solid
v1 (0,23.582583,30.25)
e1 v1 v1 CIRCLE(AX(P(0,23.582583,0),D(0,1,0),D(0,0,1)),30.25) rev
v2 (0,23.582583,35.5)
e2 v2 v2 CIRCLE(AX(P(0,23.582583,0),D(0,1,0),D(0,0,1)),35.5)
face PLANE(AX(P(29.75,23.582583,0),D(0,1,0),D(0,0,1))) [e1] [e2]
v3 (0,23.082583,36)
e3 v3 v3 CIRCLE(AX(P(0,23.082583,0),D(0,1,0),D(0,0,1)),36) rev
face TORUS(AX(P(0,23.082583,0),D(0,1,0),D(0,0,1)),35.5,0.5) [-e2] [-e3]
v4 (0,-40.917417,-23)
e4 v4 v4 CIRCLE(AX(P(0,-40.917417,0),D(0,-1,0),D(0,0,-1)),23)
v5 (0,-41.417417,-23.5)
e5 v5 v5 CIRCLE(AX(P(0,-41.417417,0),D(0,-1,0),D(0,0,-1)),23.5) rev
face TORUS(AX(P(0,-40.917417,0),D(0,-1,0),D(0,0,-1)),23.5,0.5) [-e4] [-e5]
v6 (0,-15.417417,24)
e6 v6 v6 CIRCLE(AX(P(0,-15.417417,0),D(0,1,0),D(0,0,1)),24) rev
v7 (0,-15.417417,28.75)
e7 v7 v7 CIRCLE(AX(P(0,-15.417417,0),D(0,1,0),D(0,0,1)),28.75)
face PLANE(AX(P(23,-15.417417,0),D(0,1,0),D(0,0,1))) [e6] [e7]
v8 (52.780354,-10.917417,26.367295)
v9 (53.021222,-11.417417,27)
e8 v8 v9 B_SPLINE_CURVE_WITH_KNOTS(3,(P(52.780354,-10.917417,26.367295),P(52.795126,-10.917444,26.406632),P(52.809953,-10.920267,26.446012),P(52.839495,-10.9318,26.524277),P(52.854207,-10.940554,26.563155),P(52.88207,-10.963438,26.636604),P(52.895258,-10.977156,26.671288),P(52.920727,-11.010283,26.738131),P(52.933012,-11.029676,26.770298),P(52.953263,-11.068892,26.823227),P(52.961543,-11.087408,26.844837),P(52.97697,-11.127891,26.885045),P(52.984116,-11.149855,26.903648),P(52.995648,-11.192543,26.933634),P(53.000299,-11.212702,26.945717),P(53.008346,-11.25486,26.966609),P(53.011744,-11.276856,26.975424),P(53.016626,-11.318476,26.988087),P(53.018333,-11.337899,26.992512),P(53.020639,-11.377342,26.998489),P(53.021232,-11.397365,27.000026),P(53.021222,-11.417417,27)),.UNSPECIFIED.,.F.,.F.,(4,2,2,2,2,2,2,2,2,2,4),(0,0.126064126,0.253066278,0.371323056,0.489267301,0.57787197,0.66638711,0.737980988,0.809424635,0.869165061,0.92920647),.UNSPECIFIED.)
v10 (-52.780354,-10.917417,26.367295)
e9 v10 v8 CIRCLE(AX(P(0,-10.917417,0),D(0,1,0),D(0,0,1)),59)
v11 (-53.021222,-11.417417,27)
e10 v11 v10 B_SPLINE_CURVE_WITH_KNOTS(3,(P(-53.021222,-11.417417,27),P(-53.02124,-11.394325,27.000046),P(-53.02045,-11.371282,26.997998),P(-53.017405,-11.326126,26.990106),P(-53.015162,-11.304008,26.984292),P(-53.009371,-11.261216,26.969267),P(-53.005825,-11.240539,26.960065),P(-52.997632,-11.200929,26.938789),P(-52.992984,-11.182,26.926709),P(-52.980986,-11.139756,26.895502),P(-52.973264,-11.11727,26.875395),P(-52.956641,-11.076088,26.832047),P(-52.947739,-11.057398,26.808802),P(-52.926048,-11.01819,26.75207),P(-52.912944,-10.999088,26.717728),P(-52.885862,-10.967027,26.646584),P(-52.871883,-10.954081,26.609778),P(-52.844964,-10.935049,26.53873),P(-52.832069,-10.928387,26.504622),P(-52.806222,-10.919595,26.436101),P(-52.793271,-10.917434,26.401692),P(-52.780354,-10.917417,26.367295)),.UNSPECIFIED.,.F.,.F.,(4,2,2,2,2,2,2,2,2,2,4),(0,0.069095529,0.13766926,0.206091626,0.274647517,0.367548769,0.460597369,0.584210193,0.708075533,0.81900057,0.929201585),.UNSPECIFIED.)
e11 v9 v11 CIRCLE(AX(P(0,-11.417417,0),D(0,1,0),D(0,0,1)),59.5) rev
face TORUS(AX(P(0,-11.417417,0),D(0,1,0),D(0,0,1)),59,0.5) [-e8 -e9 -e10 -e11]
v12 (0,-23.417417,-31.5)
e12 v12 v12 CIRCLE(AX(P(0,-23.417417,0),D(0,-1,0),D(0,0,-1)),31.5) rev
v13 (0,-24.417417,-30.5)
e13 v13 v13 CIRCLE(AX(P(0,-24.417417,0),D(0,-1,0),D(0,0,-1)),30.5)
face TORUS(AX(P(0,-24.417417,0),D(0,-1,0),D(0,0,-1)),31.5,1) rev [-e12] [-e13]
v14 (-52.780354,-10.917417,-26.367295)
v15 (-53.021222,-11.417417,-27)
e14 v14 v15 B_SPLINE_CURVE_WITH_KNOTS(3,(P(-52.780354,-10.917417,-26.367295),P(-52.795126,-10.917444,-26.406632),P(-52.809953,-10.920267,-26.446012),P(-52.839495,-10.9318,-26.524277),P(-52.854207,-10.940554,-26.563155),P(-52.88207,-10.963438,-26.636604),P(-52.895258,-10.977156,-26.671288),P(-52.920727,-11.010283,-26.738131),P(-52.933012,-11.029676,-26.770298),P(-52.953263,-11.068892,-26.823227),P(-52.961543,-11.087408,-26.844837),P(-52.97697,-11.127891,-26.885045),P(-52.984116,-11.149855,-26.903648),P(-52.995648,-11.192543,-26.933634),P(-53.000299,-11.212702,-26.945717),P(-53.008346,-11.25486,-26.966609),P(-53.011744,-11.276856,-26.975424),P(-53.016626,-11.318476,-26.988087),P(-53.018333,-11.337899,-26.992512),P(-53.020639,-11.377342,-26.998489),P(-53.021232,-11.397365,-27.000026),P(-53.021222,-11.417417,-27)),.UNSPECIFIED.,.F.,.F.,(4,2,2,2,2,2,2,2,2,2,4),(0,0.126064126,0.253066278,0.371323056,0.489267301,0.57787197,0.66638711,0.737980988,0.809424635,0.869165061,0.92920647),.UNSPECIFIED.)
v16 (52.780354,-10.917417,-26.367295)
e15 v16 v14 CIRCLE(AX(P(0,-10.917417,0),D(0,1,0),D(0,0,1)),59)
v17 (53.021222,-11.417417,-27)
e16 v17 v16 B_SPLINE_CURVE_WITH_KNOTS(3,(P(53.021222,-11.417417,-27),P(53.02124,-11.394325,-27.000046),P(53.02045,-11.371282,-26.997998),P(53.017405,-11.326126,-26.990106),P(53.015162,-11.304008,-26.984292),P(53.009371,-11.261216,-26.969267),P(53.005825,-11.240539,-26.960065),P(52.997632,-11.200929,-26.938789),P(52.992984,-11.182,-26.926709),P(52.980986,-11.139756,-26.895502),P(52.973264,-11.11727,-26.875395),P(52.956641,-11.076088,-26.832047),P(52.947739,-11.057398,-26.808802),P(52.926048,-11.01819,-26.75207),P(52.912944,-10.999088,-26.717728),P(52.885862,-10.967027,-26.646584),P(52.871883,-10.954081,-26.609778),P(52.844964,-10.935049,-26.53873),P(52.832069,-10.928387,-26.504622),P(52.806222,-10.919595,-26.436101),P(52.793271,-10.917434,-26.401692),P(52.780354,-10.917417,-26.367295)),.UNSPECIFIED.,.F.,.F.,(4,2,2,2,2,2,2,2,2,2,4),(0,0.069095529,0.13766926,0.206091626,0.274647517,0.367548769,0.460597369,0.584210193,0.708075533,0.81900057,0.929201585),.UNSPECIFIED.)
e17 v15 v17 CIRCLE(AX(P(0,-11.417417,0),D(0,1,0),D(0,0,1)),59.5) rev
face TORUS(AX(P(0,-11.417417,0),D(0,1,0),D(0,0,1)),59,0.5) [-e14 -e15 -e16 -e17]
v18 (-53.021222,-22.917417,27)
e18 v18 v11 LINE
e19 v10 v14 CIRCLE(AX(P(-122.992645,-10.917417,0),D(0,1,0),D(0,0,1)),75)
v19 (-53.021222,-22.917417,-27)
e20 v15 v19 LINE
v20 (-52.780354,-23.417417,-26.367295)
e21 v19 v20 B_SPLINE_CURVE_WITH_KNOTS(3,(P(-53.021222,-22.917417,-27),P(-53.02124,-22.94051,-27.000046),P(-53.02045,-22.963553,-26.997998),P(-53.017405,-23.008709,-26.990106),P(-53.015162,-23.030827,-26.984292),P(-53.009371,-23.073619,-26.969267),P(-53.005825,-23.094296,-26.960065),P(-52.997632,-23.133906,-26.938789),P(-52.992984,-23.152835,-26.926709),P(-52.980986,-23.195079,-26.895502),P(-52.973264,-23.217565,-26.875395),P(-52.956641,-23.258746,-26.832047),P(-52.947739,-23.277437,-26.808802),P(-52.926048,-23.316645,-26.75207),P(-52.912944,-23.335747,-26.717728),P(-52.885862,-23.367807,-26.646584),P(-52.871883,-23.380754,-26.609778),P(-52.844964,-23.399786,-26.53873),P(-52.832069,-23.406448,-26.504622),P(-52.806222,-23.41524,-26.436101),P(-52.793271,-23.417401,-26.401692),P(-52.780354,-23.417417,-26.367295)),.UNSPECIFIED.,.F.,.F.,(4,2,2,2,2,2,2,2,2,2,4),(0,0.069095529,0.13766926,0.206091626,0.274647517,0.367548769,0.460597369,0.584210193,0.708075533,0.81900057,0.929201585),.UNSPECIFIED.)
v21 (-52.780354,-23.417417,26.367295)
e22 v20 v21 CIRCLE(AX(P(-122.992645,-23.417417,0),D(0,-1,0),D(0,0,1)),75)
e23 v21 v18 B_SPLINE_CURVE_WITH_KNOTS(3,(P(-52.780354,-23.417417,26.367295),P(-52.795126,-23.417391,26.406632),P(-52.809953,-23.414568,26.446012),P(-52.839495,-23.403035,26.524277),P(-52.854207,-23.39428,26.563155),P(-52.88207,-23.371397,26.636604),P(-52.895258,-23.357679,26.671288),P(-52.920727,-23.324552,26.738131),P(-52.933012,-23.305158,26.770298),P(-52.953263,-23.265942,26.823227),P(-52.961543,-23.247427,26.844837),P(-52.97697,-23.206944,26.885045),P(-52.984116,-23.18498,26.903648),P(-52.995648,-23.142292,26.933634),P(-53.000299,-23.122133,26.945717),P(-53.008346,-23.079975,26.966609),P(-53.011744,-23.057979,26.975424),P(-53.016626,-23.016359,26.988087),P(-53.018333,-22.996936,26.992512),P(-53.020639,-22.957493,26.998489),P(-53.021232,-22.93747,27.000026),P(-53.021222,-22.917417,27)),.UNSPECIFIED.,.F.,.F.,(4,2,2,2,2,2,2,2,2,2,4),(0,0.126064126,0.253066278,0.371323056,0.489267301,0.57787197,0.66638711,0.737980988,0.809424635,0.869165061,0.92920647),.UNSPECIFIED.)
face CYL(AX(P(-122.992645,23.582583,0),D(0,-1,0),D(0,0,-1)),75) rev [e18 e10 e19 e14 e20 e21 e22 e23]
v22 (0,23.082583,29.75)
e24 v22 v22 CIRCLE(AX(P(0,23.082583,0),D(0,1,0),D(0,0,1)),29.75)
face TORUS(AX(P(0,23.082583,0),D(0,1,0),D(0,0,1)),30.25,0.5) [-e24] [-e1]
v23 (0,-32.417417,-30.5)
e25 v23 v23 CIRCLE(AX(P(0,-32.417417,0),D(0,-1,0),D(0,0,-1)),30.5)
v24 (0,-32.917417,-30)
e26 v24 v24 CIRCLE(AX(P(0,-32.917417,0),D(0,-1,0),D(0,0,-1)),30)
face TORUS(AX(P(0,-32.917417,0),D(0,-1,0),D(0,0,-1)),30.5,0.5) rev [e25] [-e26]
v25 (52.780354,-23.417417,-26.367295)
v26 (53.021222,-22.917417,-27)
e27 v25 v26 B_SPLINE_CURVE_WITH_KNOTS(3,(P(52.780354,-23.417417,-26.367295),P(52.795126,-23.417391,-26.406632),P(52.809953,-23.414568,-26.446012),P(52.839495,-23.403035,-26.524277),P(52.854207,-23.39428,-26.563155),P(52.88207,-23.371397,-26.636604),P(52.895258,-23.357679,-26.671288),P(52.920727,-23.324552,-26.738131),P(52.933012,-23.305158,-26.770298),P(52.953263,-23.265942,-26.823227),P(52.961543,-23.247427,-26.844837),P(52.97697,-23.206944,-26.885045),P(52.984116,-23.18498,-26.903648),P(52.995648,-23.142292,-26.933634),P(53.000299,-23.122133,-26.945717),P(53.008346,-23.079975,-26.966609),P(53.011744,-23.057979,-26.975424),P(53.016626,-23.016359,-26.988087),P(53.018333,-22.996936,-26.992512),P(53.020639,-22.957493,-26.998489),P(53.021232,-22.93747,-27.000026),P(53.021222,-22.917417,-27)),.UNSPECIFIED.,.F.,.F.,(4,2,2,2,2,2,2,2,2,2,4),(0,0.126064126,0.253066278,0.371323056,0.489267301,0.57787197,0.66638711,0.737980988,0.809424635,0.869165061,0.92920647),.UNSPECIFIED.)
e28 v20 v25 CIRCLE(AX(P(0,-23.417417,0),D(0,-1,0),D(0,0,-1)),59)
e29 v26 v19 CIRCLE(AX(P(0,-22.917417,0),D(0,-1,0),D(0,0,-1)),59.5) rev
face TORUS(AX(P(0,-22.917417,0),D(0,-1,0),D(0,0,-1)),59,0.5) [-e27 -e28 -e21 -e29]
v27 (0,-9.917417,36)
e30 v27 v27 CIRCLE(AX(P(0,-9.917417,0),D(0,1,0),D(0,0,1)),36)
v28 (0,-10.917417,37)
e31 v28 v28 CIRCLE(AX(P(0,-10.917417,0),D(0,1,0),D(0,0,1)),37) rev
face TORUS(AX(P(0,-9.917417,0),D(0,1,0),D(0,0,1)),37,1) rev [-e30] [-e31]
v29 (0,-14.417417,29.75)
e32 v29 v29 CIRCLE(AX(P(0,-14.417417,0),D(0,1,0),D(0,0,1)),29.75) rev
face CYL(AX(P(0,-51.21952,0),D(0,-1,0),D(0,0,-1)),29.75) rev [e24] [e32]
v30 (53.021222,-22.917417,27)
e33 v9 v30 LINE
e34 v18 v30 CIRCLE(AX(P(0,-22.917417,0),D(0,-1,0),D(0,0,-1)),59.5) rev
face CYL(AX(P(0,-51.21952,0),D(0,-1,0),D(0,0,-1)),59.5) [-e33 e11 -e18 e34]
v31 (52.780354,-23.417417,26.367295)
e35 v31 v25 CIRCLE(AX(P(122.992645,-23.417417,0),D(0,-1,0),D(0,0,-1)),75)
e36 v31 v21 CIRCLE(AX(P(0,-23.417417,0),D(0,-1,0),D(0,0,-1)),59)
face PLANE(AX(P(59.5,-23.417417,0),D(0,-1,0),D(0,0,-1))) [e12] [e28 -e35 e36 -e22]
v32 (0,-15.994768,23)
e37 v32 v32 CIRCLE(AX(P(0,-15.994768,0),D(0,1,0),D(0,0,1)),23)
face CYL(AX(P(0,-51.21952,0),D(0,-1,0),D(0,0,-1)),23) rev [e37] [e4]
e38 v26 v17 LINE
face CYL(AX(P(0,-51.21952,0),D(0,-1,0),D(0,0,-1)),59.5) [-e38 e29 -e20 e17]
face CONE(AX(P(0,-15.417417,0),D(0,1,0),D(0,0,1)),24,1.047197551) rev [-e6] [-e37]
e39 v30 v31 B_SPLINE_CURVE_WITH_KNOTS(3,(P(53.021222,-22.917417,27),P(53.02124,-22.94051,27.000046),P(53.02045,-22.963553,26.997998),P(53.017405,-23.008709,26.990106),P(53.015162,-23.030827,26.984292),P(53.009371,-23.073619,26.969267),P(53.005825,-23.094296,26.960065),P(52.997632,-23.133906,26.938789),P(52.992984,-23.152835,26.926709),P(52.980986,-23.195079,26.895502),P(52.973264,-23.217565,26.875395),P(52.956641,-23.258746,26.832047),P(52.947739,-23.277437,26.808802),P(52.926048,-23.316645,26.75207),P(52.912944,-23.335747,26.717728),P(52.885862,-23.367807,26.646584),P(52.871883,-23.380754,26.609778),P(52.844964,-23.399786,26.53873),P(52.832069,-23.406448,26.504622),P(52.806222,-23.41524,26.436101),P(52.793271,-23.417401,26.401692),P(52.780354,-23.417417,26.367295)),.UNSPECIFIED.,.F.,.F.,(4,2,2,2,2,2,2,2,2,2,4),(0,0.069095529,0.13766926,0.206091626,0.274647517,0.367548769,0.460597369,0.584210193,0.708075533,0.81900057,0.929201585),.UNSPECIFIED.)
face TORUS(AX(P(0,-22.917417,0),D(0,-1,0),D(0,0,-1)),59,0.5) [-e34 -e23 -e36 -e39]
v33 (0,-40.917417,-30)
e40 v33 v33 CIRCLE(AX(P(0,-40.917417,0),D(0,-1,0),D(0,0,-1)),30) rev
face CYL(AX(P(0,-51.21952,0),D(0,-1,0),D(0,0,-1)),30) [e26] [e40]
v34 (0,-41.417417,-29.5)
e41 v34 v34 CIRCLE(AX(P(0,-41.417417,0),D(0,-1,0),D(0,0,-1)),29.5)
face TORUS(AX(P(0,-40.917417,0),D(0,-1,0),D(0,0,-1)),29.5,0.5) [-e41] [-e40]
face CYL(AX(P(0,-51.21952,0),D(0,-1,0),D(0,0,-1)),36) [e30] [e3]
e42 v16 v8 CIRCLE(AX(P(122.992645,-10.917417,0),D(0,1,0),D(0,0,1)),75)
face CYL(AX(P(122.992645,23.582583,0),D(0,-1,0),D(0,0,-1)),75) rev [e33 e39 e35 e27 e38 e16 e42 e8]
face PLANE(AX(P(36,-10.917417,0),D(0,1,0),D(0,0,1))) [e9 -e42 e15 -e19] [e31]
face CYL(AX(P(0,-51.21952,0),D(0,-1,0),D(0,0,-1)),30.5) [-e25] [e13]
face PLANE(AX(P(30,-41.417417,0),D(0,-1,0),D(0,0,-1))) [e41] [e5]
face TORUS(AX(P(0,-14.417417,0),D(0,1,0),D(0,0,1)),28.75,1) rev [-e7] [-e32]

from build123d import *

# Parameters (mm, degrees)
ESBO_O2_R             = 75
CORTE_EXTRUS_O1_DEPTH = 97.382052271
FILETE1_R             = 0.5
FILETE2_R             = 1
FILETE3_R             = 1
CHANFRO1_SIZE         = 1
CHANFRO1_SIZE2        = 0.577350269
FILETE4_R             = 0.5
FILETE5_R             = 1
FILETE6_R             = 0.5
FILETE7_R             = 0.5


with BuildPart() as part:
    # Esboço1 → Revolução1 (revolve)
    with BuildSketch(Plane.XY, mode=Mode.PRIVATE) as revolu_o1_sk:
        Polygon((29.75, 23.582582583), (36, 23.582582583), (36, -10.917417417), (59.5, -10.917417417), (59.5, -23.417417417), (30.5, -23.417417417), (30.5, -32.417417417), (30, -32.417417417), (30, -41.417417417), (23, -41.417417417), (23, -15.417417417), (29.75, -15.417417417), align=None)
    revolve(revolu_o1_sk.sketch.rotate(Axis((0, -51.21951952, 0), (0, 1, 0)), 90), axis=Axis((0, -51.21951952, 0), (0, 1, 0)))

    # Esboço2 → Corte-extrusão1 (cut, through all)
    with BuildSketch(Plane.XZ.offset(23.417417417)):
        with Locations((122.992644904, 0)):
            Circle(ESBO_O2_R)
        with Locations((-122.992644904, 0)):
            Circle(ESBO_O2_R)
    extrude(amount=-CORTE_EXTRUS_O1_DEPTH, mode=Mode.SUBTRACT)

    # Filete1
    filete1_edges = [part.edges().sort_by_distance(p)[0] for p in [
        (0, 23.582582583, 36),
        (0, 23.582582583, 29.75),
    ]]
    fillet(filete1_edges, radius=FILETE1_R)

    # Filete2
    filete2_edges = [part.edges().sort_by_distance(p)[0] for p in [
        (0, -10.917417417, 36),
    ]]
    fillet(filete2_edges, radius=FILETE2_R)

    # Filete3
    filete3_edges = [part.edges().sort_by_distance(p)[0] for p in [
        (0, -15.417417417, 29.75),
    ]]
    fillet(filete3_edges, radius=FILETE3_R)

    # Chanfro1
    chanfro1_edges = [part.edges().sort_by_distance(p)[0] for p in [
        (0, -15.417417417, 23),
    ]]
    chanfro1_side = [part.faces().sort_by_distance(p)[0] for p in [
        (0, -15.417417417, 27.936827202),
    ]]
    chamfer(chanfro1_edges, length=CHANFRO1_SIZE, length2=CHANFRO1_SIZE2, reference=chanfro1_side[0])

    # Filete4
    filete4_edges = [part.edges().sort_by_distance(p)[0] for p in [
        (0, -41.417417417, 23),
        (0, -41.417417417, 30),
    ]]
    fillet(filete4_edges, radius=FILETE4_R)

    # Filete5
    filete5_edges = [part.edges().sort_by_distance(p)[0] for p in [
        (0, -23.417417417, 30.5),
    ]]
    fillet(filete5_edges, radius=FILETE5_R)

    # Filete6
    filete6_edges = [part.edges().sort_by_distance(p)[0] for p in [
        (0, -32.417417417, 30),
    ]]
    fillet(filete6_edges, radius=FILETE6_R - 0.0001)  # a hair under: the kernel refuses the full size

    # Filete7
    filete7_edges = [part.edges().sort_by_distance(p)[0] for p in [
        (0, -23.417417417, 59.5),
        (0, -10.917417417, 59.5),
        (0, -23.417417417, -59.5),
        (0, -10.917417417, -59.5),
    ]]
    fillet(filete7_edges, radius=FILETE7_R)


solid = part.part
